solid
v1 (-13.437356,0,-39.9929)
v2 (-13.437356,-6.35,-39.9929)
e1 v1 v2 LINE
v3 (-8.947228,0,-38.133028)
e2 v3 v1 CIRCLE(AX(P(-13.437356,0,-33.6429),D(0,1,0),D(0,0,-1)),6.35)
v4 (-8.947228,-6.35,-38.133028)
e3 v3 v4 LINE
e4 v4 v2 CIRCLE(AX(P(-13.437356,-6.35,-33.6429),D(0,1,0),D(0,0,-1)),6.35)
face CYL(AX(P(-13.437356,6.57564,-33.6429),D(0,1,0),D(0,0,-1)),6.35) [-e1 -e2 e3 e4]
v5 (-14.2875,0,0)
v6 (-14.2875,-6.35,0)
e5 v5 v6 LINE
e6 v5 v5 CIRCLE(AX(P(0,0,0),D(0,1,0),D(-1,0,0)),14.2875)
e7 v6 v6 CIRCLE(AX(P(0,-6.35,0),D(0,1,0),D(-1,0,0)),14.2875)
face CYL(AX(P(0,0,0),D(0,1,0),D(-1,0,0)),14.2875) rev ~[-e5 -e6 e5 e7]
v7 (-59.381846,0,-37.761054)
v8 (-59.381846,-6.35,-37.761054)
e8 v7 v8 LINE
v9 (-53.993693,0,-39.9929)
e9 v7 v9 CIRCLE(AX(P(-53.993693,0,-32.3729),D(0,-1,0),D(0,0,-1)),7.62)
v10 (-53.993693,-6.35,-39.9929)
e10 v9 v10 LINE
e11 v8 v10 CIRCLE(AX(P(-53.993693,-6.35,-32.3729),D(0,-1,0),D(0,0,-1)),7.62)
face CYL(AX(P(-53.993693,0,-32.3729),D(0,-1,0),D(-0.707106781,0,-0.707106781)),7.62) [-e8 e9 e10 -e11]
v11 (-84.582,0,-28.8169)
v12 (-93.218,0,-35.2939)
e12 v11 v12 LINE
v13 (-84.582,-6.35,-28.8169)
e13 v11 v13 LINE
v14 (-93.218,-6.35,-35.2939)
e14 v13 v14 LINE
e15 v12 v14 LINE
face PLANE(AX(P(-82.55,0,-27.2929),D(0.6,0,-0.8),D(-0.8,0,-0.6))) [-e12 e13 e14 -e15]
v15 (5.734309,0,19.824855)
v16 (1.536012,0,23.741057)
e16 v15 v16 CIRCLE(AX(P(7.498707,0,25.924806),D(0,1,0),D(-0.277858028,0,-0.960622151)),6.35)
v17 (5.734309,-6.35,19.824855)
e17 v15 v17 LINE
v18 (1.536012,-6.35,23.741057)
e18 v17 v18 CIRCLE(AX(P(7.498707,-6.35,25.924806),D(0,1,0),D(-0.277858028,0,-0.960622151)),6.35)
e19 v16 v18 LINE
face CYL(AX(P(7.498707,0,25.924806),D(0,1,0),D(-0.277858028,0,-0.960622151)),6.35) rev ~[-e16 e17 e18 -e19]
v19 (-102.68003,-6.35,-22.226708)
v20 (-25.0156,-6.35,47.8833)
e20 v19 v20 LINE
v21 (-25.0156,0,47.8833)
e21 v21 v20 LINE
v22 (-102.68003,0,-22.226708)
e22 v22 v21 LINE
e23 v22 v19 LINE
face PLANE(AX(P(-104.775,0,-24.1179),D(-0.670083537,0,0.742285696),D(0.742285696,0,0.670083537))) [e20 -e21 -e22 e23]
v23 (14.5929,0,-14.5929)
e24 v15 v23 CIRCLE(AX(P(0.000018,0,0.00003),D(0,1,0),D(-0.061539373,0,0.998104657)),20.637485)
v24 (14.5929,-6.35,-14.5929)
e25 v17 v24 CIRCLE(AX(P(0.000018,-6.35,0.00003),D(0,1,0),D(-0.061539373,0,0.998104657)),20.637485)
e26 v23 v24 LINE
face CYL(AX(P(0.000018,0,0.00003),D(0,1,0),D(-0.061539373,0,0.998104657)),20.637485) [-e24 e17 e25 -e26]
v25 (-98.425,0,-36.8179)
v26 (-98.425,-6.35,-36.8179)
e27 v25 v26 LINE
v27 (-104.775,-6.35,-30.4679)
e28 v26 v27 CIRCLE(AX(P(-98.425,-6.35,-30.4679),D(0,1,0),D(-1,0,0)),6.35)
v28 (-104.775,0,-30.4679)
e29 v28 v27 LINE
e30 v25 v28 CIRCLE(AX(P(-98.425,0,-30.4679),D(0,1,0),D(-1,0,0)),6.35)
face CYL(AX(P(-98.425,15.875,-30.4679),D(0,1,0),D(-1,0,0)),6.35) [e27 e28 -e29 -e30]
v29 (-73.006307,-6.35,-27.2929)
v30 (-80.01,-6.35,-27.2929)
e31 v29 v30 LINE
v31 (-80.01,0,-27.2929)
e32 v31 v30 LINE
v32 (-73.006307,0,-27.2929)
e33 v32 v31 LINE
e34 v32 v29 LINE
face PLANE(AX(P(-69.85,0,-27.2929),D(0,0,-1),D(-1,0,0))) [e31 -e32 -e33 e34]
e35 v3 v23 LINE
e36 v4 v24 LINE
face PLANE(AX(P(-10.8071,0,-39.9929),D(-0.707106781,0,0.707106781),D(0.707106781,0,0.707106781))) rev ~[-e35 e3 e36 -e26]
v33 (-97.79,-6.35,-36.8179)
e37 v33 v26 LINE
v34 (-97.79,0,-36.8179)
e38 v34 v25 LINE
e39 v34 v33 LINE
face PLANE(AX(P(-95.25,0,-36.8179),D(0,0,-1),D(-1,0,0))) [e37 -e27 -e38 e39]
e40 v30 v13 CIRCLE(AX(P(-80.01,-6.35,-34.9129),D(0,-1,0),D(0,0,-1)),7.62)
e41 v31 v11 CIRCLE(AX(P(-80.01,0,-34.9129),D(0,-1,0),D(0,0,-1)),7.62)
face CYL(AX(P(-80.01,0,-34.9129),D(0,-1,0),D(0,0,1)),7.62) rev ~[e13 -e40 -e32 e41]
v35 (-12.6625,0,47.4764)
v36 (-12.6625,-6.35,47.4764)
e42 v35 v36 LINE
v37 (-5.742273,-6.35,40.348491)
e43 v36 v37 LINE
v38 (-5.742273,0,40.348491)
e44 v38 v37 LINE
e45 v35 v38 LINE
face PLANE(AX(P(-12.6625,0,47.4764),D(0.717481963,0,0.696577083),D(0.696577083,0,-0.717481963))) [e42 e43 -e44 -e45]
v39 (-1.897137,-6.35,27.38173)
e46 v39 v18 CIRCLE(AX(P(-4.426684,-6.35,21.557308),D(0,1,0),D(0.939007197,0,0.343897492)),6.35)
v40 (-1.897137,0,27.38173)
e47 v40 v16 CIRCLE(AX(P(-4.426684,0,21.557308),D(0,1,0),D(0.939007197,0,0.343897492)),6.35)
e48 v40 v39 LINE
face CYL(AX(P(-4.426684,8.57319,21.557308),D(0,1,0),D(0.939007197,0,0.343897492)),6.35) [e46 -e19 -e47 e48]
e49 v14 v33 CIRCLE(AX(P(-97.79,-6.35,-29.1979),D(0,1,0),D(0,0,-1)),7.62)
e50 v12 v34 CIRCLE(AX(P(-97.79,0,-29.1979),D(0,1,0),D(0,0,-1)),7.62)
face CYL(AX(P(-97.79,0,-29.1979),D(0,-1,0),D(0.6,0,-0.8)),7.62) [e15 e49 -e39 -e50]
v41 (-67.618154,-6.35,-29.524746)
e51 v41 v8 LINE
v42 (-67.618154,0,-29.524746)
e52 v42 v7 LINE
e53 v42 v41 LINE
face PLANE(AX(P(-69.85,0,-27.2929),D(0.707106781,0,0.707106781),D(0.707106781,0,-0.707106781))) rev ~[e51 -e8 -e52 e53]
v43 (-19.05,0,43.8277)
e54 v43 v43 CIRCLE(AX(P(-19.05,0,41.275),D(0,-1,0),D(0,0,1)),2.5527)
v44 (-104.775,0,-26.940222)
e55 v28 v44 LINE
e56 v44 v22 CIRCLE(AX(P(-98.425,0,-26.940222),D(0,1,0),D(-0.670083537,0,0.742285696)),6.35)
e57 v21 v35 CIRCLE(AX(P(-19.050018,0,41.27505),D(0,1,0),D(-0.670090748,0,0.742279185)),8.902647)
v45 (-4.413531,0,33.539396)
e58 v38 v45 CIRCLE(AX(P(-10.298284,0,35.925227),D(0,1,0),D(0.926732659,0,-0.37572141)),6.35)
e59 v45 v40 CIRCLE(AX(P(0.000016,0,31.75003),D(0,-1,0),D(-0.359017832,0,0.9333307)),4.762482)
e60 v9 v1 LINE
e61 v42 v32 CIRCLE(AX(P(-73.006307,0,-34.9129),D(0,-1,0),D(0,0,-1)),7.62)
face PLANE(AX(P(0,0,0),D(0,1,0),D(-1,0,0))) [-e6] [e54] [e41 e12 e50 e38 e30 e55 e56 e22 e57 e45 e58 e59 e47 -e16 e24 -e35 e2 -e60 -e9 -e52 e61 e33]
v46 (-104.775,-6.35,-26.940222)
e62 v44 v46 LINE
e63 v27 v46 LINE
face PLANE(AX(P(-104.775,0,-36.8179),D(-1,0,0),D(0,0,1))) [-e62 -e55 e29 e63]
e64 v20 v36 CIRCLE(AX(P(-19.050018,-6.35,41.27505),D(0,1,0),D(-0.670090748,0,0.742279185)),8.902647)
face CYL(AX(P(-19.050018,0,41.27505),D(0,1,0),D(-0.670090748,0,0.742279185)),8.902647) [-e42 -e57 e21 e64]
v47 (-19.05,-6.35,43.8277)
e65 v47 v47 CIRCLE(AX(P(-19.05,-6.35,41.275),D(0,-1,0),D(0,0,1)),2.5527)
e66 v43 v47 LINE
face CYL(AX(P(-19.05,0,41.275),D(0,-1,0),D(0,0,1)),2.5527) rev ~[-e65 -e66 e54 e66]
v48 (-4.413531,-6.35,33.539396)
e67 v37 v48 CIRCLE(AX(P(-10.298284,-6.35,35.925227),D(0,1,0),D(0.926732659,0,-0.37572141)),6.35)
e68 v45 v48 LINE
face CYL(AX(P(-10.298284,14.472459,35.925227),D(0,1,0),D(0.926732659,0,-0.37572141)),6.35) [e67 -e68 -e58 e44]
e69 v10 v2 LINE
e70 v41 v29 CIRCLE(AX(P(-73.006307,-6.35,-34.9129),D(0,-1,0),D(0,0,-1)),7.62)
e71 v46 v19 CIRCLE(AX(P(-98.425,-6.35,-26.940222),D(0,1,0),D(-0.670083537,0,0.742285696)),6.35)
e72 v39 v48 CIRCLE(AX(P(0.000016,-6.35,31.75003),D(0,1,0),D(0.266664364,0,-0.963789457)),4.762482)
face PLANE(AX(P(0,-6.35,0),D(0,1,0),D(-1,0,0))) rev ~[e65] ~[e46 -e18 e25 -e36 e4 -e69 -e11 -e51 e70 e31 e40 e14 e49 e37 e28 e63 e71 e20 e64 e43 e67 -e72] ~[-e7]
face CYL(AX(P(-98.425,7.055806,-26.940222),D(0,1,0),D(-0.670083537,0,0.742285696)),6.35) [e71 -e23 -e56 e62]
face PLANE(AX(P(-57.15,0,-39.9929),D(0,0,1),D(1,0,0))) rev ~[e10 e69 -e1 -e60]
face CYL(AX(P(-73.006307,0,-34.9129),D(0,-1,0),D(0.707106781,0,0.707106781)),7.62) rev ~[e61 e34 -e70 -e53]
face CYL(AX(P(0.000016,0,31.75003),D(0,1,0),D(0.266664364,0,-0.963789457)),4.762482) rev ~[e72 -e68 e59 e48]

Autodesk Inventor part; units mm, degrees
ref_plane "YZ Plane" through (0, 0, 0) normal (1, 0, 0) x (0, 1, 0)
ref_plane "XZ Plane" through (0, 0, 0) normal (0, 1, 0) x (-1, 0, 0)
ref_plane "XY Plane" through (0, 0, 0) normal (0, 0, 1) x (1, 0, 0)
sketch "Sketch1" plane through (0, 0, 0) normal (0, 1, 0) x (-1, 0, 0)
  circle A0 centre (76.2, -63.1164) radius 16.7005 construction
  line L0 (69.85, -27.2929) -> (82.55, -27.2929)
  line L1 (82.55, -27.2929) -> (95.25, -36.8179)
  line L2 (95.25, -36.8179) -> (104.775, -36.8179)
  line L3 (104.775, -36.8179) -> (104.775, -24.1179)
  line L4 (104.775, -24.1179) -> (25.0156, 47.8833)
  line L5 (69.85, -27.2929) -> (57.15, -39.9929)
  line L6 (57.15, -39.9929) -> (10.8071, -39.9929)
  circle A1 centre (0, 0) radius 14.2875
  circle A2 centre (0, 0) radius 20.6375 construction
  line L7 (10.8071, -39.9929) -> (-14.5929, -14.5929)
  circle A3 centre (0, 31.75) radius 4.7625 construction
  circle A4 centre (19.05, 41.275) radius 2.5527 construction
  circle A5 centre (19.05, 41.275) radius 8.9027 construction
  line L8 (12.6625, 47.4764) -> (1.7098, 36.195)
  arc A6 (-1.27, 27.16) -> (1.7098, 36.195) centre (0, 31.75) ccw
  arc A7 (1.27, 20.5984) -> (-14.5929, -14.5929) centre (0, 0) ccw
  arc A8 (25.0156, 47.8833) -> (12.6625, 47.4764) centre (19.05, 41.275) ccw
  line L9 (-1.27, 27.16) -> (1.27, 20.5984)
  point P0 (76.2, -27.2929)
  dimension "d0" = 33.401
  dimension "d1" = 28.575
  dimension "d2" = 6.35
  dimension "d3" = 9.525
  dimension "d4" = 31.75
  dimension "d5" = 5.1054
  dimension "d6" = 6.35
  dimension "d7" = 19.05
  dimension "d8" = 9.525
  dimension "d9" = 25.4
  dimension "d10" = 25.4
  dimension "d11" = 12.7
  dimension "d12" = 12.7
  dimension "d13" = 12.7
  dimension "d15" = 76.2
  dimension "d16" = 76.2
  dimension "d17" = 12.7
  dimension "d18" = 3.175
  dimension "d19" = 9.525
  dimension "d20" = 12.7
  dimension "d34" = 4.445
  dimension "d35" = 1.27
  dimension "d36" = 1.27
extrude "Extrusion1" add sketch "Sketch1" against normal blind 6.35
fillet "Fillet1" radius 6.35 6 edges at (-1.7098, -3.175, 36.195) (-10.8071, -3.175, -39.9929) (-104.775, -3.175, -24.1179) (-104.775, -3.175, -36.8179) (1.27, -3.175, 27.16) (-1.27, -3.175, 20.5984)
fillet "Fillet2" radius 7.62 4 edges at (-69.85, -3.175, -27.2929) (-82.55, -3.175, -27.2929) (-57.15, -3.175, -39.9929) (-95.25, -3.175, -36.8179)
hole "Hole1" at (-19.05, 0, 41.275) direction (0, -1, 0) diameter 5.1054 end through all clearance for "Flat Head Machine Screw (82)" size "#10" standard "Ansi Unified Screw Threads"
equation "\"d17\" = d12"
properties part number "CL5-003" material "Aluminum 6061"
